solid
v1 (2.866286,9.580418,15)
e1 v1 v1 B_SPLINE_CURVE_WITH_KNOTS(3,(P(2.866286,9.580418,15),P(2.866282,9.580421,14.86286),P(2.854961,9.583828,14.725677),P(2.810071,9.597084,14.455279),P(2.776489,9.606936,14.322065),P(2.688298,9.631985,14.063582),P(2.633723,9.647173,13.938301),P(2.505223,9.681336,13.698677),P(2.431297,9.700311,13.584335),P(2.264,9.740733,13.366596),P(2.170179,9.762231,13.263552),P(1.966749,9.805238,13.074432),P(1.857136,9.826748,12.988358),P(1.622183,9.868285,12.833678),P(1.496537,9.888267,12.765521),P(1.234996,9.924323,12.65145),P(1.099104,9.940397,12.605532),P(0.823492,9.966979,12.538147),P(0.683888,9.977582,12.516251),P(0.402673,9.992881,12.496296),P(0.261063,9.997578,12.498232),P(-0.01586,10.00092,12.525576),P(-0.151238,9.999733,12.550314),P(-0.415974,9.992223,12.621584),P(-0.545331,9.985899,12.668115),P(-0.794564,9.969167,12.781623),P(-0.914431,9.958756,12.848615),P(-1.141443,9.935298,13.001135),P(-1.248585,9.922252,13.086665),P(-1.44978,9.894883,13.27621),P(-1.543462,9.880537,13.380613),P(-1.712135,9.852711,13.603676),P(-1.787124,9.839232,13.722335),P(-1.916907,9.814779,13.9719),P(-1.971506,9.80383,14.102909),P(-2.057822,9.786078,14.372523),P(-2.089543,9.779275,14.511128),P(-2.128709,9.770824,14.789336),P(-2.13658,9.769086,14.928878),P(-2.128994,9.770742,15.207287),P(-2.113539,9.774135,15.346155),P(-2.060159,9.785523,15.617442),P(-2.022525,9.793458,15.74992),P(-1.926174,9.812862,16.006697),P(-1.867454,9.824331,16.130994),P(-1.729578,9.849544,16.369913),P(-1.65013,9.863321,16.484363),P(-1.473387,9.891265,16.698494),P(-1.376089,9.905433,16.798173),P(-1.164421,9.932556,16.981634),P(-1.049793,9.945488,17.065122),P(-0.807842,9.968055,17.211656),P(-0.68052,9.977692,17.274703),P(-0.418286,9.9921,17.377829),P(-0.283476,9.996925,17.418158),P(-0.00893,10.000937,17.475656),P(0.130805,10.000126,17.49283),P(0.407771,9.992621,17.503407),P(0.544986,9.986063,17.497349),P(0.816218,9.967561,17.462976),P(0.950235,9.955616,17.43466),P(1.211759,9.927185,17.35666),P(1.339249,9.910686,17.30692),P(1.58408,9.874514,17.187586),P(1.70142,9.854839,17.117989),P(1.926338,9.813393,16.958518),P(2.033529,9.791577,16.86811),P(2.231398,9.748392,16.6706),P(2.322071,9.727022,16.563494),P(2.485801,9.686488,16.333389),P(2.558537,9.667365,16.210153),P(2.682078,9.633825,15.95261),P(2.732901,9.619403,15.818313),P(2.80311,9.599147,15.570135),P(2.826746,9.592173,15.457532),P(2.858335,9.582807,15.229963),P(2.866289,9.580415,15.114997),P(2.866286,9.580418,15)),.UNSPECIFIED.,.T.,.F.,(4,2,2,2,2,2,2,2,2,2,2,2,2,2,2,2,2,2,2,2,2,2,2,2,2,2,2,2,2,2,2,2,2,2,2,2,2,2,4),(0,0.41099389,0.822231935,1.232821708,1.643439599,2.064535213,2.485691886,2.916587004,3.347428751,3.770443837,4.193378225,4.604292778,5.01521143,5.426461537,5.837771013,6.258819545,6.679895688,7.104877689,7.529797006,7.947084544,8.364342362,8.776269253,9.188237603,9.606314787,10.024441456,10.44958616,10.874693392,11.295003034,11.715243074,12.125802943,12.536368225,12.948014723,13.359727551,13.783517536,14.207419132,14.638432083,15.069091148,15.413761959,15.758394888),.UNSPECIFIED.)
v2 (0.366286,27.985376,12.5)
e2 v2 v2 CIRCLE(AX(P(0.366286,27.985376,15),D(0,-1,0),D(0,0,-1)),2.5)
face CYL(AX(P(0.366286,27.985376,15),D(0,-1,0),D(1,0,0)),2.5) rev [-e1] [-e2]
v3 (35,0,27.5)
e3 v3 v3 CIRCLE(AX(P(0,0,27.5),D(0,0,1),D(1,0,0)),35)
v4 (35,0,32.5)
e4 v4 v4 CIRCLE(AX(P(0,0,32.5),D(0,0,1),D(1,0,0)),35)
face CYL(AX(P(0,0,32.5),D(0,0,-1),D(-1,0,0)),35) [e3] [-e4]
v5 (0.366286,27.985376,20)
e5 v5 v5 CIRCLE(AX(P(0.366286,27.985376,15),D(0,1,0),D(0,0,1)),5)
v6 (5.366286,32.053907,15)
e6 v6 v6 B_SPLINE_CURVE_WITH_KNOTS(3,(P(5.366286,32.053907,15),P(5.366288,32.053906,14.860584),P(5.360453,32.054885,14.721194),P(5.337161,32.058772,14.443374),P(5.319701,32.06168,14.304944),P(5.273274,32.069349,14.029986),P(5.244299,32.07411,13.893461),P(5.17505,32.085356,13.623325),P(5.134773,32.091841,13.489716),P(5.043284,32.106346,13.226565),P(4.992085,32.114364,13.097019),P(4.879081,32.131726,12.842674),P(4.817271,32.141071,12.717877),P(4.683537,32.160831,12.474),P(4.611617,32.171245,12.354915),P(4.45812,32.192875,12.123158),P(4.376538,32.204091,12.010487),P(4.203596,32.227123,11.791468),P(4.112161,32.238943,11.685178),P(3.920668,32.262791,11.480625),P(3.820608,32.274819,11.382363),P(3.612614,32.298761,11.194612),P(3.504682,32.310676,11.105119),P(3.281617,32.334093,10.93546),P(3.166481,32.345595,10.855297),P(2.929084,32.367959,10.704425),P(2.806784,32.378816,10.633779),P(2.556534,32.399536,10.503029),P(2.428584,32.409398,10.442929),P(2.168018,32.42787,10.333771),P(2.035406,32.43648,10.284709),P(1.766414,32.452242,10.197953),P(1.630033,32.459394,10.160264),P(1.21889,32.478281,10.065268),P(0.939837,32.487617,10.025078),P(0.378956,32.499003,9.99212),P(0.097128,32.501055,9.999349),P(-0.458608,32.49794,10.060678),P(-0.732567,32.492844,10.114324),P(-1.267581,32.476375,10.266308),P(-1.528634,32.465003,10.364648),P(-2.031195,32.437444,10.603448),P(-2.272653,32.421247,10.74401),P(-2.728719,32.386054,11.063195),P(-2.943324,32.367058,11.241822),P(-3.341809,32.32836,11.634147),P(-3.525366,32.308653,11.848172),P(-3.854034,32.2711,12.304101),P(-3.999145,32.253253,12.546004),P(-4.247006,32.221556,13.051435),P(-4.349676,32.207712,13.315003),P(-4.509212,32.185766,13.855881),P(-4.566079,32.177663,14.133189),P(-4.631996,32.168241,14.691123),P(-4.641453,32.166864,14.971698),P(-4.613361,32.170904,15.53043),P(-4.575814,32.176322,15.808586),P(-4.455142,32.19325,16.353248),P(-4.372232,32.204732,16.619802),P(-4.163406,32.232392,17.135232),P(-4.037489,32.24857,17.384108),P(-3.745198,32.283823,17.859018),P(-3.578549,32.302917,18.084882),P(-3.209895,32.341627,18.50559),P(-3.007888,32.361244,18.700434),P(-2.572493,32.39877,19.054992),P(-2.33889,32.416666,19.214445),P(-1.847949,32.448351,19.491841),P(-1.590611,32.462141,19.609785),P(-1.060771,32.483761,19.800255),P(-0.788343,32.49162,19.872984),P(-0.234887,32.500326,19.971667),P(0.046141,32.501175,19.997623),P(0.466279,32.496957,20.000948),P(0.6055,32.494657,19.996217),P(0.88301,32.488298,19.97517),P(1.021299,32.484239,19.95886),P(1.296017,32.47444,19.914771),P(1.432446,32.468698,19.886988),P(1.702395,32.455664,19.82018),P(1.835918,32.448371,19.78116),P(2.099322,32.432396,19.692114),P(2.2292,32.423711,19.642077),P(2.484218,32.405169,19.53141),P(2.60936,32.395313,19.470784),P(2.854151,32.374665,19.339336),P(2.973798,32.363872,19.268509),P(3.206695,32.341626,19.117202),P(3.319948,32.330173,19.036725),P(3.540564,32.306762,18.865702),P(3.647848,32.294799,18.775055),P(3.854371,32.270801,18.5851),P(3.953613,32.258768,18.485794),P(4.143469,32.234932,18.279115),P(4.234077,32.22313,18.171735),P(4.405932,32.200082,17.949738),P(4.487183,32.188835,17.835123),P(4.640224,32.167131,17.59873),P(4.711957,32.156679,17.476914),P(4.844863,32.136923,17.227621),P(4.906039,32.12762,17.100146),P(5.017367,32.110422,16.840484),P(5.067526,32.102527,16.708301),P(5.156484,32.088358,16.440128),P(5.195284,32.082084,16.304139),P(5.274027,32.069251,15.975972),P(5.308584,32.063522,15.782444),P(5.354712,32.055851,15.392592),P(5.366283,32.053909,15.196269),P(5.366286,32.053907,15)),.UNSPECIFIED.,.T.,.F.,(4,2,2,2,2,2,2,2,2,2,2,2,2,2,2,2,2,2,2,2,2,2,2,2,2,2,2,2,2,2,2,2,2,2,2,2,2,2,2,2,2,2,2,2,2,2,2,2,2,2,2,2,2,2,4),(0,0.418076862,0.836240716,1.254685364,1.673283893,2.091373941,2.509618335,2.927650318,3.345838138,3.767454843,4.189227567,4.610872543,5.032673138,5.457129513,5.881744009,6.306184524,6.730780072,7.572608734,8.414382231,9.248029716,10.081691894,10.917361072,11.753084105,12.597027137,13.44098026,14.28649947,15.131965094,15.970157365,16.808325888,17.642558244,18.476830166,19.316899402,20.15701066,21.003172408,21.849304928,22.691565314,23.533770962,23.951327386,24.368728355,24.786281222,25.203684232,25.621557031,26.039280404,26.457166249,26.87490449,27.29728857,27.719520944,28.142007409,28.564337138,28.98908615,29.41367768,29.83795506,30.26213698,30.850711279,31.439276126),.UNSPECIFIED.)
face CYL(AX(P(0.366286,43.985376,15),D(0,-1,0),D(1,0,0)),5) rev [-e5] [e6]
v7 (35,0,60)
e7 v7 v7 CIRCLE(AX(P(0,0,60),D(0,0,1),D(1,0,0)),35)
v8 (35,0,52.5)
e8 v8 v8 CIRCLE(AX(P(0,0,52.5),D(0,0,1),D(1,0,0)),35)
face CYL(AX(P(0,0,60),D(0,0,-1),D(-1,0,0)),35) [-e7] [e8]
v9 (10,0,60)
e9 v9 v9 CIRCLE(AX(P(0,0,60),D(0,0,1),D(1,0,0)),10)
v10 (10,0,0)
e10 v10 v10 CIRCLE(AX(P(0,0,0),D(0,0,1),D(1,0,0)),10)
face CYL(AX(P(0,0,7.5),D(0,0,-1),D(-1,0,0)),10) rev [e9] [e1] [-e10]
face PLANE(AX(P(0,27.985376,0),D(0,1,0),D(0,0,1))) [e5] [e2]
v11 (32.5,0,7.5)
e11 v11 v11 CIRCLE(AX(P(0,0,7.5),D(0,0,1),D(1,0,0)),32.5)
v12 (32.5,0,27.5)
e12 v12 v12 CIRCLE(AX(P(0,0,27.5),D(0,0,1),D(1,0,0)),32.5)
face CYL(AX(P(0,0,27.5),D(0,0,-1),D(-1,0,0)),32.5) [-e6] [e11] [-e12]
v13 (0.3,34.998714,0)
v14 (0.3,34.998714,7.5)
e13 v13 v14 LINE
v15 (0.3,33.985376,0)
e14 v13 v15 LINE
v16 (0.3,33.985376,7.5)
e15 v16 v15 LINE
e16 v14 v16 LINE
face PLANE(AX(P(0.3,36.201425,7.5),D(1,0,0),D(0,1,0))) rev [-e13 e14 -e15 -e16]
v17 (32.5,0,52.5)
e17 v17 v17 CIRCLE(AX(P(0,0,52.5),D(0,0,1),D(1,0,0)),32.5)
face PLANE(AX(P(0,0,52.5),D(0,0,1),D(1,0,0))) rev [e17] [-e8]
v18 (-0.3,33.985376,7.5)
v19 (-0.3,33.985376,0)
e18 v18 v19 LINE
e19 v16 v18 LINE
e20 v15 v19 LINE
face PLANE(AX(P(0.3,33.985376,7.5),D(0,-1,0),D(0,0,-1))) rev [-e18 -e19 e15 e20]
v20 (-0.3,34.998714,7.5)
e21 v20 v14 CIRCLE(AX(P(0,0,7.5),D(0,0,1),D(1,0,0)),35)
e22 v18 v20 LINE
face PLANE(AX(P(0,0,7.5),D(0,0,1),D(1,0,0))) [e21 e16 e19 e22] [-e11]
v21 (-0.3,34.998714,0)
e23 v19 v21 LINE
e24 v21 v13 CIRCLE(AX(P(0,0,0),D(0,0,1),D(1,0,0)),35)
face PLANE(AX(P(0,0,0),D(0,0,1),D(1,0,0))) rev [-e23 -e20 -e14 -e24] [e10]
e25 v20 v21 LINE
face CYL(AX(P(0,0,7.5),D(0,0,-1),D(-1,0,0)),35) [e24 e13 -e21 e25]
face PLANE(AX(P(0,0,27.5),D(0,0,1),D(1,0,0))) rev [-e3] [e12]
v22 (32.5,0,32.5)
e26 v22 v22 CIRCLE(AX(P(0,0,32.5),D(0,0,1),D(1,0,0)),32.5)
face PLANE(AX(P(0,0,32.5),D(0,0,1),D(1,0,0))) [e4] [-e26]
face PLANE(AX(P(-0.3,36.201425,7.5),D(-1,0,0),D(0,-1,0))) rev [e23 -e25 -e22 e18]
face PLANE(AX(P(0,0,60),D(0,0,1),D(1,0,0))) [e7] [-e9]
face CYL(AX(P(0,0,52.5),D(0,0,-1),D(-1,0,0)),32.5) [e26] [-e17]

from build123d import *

# Parameters (mm, degrees)
ESQUISSE1_R                 = 35
ESQUISSE1_R_2               = 10
BOSS_EXTRU_1_DEPTH          = 7.5
ESQUISSE2_R                 = 32.5
ESQUISSE2_R_2               = 10
BOSS_EXTRU_2_DEPTH          = 20
ESQUISSE3_R                 = 35
ESQUISSE3_R_2               = 10
BOSS_EXTRU_3_DEPTH          = 5
ESQUISSE4_R                 = 32.5
ESQUISSE4_R_2               = 10
BOSS_EXTRU_4_DEPTH          = 20
ESQUISSE5_R                 = 35
ESQUISSE5_R_2               = 10
BOSS_EXTRU_5_DEPTH          = 7.5
ESQUISSE7_W                 = 0.6
ESQUISSE7_H                 = 2.216048933
ENL_V_MAT_EXTRU_3_DEPTH     = 7.5
ENL_V_MAT_EXTRU_6_OUTLINE_W = 5
ENL_V_MAT_EXTRU_6_OUTLINE_H = 4.514677359
ENL_V_START                 = 9.580417676
ENL_V_MAT_EXTRU_7_OUTLINE_R = 2.5
ENL_V_MAT_EXTRU_7_DEPTH     = 18.40495848


# Read off the part's stored shape, not the designer's step: Enlèv. mat.-Extru.6, Enlèv. mat.-Extru.7
with BuildPart() as part:
    # Esquisse1 → Boss.-Extru.1 (new body)
    with BuildSketch(Plane.XY):
        Circle(ESQUISSE1_R)
        Circle(ESQUISSE1_R_2, mode=Mode.SUBTRACT)
    extrude(amount=BOSS_EXTRU_1_DEPTH)

    # Esquisse2 → Boss.-Extru.2 (add)
    with BuildSketch(Plane.XY.offset(7.5)):
        Circle(ESQUISSE2_R)
        Circle(ESQUISSE2_R_2, mode=Mode.SUBTRACT)
    extrude(amount=BOSS_EXTRU_2_DEPTH)

    # Esquisse3 → Boss.-Extru.3 (add)
    with BuildSketch(Plane.XY.offset(27.5)):
        Circle(ESQUISSE3_R)
        Circle(ESQUISSE3_R_2, mode=Mode.SUBTRACT)
    extrude(amount=BOSS_EXTRU_3_DEPTH)

    # Esquisse4 → Boss.-Extru.4 (add)
    with BuildSketch(Plane.XY.offset(32.5)):
        Circle(ESQUISSE4_R)
        Circle(ESQUISSE4_R_2, mode=Mode.SUBTRACT)
    extrude(amount=BOSS_EXTRU_4_DEPTH)

    # Esquisse5 → Boss.-Extru.5 (add)
    with BuildSketch(Plane.XY.offset(52.5)):
        Circle(ESQUISSE5_R)
        Circle(ESQUISSE5_R_2, mode=Mode.SUBTRACT)
    extrude(amount=BOSS_EXTRU_5_DEPTH)

    # Esquisse7 → Enlèv. mat.-Extru.3 (cut)
    with BuildSketch(Plane(origin=(0, 0, 0), x_dir=(-1, 0, 0), z_dir=(0, 0, -1))):
        with Locations((0, 35.093400622)):
            Rectangle(ESQUISSE7_W, ESQUISSE7_H)
    extrude(amount=-ENL_V_MAT_EXTRU_3_DEPTH, mode=Mode.SUBTRACT)

    # Enlèv. mat.-Extru.6 outline → Enlèv. mat.-Extru.6 (revolve, cut)
    with BuildSketch(Plane(origin=(0.366285961, 0, 15), x_dir=(1, 0, 0), z_dir=(0, 0, 1))):
        with Locations((2.5, 30.242714836)):
            Rectangle(ENL_V_MAT_EXTRU_6_OUTLINE_W, ENL_V_MAT_EXTRU_6_OUTLINE_H)
    revolve(axis=Axis((0.366285961, 0, 15), (0, 1, 0)), mode=Mode.SUBTRACT)

    # Enlèv. mat.-Extru.7 outline → Enlèv. mat.-Extru.7 (cut)
    with BuildSketch(Plane(origin=(0, 0, 0), x_dir=(1, 0, 0), z_dir=(0, 1, 0)).offset(ENL_V_START)):
        with Locations((0.366285961, -15)):
            Circle(ENL_V_MAT_EXTRU_7_OUTLINE_R)
    extrude(amount=ENL_V_MAT_EXTRU_7_DEPTH, mode=Mode.SUBTRACT)


solid = part.part
